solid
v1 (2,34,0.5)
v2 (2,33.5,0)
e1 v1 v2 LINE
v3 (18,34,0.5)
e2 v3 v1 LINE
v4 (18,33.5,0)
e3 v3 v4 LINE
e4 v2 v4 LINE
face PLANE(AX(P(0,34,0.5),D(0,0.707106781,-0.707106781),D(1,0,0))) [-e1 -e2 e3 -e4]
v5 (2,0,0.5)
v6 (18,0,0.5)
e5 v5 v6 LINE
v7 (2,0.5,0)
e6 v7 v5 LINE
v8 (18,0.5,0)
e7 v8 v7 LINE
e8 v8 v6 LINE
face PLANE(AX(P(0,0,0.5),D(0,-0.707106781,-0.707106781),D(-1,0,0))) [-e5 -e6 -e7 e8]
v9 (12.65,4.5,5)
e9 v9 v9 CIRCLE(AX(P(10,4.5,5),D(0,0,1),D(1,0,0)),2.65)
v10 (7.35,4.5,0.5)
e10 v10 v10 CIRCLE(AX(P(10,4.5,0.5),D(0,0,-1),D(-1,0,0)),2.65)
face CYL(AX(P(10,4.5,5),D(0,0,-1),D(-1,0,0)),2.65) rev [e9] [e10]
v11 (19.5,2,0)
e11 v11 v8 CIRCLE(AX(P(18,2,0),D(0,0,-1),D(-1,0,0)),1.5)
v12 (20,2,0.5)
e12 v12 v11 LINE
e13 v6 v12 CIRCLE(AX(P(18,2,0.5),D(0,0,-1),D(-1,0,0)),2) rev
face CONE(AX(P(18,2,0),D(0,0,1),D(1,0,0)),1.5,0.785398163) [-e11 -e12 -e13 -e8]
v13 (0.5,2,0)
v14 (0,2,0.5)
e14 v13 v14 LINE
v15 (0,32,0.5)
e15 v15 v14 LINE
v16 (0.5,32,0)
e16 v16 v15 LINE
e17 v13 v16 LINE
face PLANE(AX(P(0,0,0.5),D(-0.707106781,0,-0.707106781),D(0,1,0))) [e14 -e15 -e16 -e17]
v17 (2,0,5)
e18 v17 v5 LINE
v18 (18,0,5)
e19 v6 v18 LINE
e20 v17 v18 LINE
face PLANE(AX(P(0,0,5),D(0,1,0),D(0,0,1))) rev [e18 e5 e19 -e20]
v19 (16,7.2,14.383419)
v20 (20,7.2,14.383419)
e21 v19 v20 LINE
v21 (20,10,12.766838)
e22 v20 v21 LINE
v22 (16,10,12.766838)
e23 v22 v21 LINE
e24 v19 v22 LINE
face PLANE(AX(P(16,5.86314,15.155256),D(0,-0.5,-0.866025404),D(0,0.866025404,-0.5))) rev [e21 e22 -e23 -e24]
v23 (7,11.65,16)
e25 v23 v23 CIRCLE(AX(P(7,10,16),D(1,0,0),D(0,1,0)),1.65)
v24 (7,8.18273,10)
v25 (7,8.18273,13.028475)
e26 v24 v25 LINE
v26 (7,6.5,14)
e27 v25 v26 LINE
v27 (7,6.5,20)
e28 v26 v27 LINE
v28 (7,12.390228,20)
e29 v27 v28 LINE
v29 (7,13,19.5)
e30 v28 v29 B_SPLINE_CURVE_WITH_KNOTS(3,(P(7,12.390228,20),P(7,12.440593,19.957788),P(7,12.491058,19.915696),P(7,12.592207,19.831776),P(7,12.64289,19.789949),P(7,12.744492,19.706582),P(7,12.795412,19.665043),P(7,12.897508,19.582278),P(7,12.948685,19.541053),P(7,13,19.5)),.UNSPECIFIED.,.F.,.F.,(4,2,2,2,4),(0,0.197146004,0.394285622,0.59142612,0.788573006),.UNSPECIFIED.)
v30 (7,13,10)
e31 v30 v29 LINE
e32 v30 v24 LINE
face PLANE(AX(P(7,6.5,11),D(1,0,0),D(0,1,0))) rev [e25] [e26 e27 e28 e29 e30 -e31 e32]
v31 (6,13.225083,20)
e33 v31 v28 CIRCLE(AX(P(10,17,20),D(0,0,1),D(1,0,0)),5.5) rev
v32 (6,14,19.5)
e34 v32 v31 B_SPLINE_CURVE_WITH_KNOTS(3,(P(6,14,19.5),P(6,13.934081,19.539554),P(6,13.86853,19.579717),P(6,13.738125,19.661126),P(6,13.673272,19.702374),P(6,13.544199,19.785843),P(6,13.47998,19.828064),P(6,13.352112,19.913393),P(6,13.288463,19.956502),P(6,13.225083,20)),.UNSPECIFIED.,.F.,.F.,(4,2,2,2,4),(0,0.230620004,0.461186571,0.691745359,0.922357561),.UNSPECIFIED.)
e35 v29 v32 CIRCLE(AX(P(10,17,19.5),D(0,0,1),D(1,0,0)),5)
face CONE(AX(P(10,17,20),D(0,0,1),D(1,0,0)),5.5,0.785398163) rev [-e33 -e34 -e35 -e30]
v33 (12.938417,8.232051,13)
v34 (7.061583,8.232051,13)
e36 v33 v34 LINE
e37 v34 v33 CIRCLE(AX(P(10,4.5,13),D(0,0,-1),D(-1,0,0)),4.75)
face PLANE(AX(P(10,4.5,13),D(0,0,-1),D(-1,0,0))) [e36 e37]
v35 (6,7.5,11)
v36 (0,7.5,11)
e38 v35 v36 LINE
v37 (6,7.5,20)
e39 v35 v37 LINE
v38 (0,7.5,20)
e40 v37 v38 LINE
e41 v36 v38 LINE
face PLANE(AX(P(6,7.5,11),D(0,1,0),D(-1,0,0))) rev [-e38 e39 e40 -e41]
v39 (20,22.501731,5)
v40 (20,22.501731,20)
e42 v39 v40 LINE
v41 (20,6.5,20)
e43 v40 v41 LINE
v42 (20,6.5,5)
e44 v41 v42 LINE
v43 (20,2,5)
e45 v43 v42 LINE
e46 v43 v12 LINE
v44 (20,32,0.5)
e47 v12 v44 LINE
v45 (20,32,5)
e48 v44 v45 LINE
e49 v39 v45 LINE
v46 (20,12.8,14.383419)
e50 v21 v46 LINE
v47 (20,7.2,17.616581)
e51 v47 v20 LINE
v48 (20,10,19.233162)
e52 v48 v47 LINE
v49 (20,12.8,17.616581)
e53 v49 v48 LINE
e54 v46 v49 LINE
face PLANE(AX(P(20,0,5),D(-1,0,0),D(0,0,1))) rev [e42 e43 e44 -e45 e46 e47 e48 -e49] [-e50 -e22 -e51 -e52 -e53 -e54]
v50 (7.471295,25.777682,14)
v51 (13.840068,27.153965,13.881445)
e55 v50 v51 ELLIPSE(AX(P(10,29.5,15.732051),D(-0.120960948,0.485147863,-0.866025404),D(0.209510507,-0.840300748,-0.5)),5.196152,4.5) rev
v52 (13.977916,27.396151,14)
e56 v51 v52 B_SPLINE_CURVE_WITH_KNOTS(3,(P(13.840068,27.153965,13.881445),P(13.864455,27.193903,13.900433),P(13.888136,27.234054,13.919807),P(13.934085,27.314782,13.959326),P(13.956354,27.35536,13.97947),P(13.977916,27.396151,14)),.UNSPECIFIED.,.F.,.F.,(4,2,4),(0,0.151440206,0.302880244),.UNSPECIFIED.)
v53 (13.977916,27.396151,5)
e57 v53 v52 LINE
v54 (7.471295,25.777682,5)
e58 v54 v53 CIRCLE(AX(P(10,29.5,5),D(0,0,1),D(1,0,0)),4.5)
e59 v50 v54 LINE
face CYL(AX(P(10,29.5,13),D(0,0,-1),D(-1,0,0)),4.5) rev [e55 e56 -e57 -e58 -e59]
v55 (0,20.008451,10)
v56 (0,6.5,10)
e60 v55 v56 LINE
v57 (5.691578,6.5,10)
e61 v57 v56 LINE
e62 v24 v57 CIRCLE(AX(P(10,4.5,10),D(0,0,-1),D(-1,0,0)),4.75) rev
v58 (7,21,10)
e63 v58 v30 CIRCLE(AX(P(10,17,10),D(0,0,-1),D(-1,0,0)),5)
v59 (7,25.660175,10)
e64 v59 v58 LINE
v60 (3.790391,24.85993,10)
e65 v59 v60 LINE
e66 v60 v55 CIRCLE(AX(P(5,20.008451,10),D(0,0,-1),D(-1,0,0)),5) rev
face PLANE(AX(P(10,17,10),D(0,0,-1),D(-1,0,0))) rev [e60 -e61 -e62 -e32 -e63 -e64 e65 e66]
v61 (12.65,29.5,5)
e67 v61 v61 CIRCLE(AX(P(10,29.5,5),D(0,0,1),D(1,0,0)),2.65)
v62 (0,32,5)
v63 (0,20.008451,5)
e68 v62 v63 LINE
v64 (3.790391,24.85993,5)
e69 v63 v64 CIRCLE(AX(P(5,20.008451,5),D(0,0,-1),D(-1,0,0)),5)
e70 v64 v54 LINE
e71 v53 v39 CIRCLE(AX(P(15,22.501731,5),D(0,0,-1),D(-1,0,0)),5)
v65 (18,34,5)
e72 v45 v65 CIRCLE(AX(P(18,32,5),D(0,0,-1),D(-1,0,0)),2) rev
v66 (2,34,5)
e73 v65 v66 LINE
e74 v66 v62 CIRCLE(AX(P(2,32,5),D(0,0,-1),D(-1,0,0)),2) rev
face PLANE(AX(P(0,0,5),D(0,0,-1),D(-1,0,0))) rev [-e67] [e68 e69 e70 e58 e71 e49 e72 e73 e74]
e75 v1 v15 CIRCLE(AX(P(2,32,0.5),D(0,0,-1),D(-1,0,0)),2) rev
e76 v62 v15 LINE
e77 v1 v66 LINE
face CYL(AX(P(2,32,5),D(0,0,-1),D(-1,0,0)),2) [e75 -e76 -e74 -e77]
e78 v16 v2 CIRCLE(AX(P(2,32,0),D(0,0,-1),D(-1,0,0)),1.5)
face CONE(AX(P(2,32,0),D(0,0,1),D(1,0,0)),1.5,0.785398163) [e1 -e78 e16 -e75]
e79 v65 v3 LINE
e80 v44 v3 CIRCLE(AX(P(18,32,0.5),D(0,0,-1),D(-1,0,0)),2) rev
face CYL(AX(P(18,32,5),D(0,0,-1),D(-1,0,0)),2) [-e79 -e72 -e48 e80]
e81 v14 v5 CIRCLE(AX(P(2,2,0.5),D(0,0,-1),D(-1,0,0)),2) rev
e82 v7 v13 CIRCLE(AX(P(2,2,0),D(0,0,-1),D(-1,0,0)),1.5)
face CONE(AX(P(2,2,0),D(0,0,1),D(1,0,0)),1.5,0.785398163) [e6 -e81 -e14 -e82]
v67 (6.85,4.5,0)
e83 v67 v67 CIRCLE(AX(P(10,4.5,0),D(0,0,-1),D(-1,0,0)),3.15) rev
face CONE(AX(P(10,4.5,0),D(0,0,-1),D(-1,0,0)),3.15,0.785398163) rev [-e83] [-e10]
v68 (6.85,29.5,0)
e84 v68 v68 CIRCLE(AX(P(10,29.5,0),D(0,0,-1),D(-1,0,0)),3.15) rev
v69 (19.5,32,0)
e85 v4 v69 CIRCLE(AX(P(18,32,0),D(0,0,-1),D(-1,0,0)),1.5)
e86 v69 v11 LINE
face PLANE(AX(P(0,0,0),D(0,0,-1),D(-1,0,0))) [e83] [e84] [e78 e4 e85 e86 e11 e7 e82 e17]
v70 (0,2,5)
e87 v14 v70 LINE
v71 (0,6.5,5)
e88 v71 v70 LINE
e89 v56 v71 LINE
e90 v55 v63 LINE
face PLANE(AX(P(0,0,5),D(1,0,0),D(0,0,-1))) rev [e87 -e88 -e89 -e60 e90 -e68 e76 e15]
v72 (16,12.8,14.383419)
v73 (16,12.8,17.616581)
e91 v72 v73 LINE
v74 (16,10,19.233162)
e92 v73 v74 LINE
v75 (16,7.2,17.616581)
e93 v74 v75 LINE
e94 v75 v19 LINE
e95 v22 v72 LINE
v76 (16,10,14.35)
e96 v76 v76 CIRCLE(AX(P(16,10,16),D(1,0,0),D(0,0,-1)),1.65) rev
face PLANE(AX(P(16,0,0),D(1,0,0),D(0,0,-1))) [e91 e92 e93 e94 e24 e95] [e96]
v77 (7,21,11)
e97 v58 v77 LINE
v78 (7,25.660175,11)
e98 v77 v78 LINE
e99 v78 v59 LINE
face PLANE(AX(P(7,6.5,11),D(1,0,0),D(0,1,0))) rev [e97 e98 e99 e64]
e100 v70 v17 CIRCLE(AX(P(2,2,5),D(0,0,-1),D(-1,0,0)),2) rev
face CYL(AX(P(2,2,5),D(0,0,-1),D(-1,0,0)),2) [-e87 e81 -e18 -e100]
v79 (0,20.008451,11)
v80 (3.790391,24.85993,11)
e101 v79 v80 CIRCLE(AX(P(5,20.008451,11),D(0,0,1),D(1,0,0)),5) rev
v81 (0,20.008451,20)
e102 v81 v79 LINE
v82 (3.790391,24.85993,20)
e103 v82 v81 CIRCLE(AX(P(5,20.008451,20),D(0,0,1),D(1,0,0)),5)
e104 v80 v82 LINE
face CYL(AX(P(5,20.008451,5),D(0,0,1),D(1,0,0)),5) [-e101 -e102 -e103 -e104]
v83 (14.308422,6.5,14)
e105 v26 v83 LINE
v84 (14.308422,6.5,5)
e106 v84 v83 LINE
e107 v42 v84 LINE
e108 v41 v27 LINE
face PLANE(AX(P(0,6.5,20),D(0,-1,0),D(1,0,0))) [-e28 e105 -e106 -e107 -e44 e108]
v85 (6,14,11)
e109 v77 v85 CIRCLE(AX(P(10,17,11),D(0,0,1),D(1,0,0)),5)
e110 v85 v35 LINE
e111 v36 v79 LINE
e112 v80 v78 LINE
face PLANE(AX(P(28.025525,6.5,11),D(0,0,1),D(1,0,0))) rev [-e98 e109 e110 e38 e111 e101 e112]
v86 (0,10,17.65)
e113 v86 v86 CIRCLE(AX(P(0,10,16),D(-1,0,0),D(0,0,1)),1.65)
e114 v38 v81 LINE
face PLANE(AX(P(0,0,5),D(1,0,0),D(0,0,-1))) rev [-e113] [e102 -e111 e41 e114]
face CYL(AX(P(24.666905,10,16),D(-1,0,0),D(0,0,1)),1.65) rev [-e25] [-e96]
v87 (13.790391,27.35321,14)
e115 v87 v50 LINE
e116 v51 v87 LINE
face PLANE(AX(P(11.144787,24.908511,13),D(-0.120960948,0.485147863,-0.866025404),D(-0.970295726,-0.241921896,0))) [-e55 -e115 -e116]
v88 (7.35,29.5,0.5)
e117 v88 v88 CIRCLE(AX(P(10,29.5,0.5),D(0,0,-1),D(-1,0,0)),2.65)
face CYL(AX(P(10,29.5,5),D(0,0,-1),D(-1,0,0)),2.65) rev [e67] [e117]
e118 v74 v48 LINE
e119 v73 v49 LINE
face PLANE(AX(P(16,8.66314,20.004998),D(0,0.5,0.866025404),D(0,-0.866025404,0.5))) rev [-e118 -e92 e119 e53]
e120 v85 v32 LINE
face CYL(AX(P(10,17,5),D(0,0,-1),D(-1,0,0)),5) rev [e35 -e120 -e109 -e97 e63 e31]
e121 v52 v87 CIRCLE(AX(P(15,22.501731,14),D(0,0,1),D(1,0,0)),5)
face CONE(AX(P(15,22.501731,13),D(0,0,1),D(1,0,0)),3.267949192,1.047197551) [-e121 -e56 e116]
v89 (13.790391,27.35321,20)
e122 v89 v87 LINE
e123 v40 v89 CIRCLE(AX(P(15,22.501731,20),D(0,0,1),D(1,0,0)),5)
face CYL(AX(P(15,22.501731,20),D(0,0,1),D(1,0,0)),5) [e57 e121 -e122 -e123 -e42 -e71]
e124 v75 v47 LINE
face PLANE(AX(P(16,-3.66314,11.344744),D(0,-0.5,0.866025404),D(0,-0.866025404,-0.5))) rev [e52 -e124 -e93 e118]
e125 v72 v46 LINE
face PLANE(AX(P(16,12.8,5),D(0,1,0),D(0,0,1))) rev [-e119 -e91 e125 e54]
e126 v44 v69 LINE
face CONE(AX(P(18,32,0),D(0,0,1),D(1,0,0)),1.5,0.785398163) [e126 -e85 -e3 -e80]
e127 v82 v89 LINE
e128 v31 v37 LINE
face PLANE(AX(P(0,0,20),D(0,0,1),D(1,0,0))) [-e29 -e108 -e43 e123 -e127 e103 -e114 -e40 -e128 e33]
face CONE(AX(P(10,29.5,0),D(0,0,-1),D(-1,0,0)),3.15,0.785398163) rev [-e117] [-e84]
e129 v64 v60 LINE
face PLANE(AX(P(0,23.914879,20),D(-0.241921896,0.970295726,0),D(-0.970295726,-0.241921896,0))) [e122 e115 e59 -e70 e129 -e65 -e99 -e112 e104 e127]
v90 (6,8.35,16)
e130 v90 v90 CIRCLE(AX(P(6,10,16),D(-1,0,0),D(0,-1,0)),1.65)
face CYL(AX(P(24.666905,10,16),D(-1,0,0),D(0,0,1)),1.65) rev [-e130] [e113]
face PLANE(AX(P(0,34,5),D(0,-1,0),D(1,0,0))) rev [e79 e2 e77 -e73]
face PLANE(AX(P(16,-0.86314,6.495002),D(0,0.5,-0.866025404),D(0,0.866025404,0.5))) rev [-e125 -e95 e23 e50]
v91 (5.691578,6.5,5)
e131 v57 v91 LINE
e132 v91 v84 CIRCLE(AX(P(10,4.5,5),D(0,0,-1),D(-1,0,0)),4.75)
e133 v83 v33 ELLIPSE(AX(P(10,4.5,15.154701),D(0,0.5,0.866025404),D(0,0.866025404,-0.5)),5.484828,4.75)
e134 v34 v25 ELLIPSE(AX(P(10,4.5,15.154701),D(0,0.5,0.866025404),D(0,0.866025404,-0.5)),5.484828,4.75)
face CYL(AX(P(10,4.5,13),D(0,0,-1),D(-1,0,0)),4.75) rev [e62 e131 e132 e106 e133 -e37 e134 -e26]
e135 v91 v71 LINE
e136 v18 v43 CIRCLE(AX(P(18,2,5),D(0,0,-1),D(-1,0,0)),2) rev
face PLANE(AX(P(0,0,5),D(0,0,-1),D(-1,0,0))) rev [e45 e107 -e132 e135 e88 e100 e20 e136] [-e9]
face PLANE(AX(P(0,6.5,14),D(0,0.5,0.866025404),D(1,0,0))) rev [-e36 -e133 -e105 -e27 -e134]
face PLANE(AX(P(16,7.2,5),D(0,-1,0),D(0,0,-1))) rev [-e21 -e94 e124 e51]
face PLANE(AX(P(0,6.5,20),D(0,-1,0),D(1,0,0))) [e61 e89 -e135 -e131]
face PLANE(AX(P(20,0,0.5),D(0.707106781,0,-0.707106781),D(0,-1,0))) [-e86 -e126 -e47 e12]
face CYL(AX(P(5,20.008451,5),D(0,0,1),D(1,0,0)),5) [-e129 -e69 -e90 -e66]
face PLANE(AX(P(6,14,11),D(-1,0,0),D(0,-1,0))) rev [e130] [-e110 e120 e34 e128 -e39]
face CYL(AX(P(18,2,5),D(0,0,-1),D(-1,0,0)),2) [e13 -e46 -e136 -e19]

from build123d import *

# Parameters (mm, degrees)
ESBO_O1_W                = 20
ESBO_O1_H                = 34
ESBO_O1_R                = 5
ESBO_O1_R_2              = 2.65
RESSALTO_EXTRUS_O1_DEPTH = 5
ESBO_O2_R                = 5
RESSALTO_EXTRUS_O2_DEPTH = 20
CORTE_EXTRUS_O1_START    = -9
CORTE_EXTRUS_O1_DEPTH    = 9
CORTE_EXTRUS_O3_REACH    = 46.227
ESBO_O5_R                = 1.65
CORTE_EXTRUS_O2_DEPTH    = 4
FILETE1_R                = 5
FILETE2_R                = 2
CORTE_EXTRUS_O4_START    = -15
ESBO_O6_R                = 4.75
CORTE_EXTRUS_O4_DEPTH    = 8
ESBO_O7_R                = 5
RESSALTO_EXTRUS_O3_DEPTH = 10
ESBO_O8_W                = 1
ESBO_O8_H                = 21.001730979
CORTE_EXTRUS_O5_DEPTH    = 7
ESBO_O10_R               = 4.5
CORTE_EXTRUS_O7_DEPTH    = 8
CHANFRO5_SIZE            = 1.732050808
CHANFRO5_SIZE_2          = 1
CORTE_EXTRUS_O8_START    = -10
CORTE_EXTRUS_O8_DEPTH    = 10
CHANFRO2_SIZE            = 0.5


with BuildPart() as part:
    # Esboço1 → Ressalto-extrusão1 (new body)
    with BuildSketch(Plane.XY):
        with Locations((10, 17)):
            Rectangle(ESBO_O1_W, ESBO_O1_H)
        with Locations((10, 17)):
            Circle(ESBO_O1_R, mode=Mode.SUBTRACT)
        with Locations((10, 29.5)):
            Circle(ESBO_O1_R_2, mode=Mode.SUBTRACT)
        with Locations((10, 4.5)):
            Circle(ESBO_O1_R_2, mode=Mode.SUBTRACT)
    extrude(amount=RESSALTO_EXTRUS_O1_DEPTH)

    # Esboço2 → Ressalto-extrusão2 (add)
    with BuildSketch(Plane(origin=(0, 0, 0), x_dir=(-1, 0, 0), z_dir=(0, 0, -1))):
        Polygon((0, 23.914879084), (-20, 28.90143914), (-20, 6.5), (0, 6.5), align=None)
        with Locations((-10, 17)):
            Circle(ESBO_O2_R, mode=Mode.SUBTRACT)
    extrude(amount=-RESSALTO_EXTRUS_O2_DEPTH)

    # Esboço3 → Corte-extrusão1 (cut)
    with BuildSketch(Plane.XY.offset(20).offset(CORTE_EXTRUS_O1_START)):
        with BuildLine():
            Line((6, 14), (6, 7.5))
            Line((6, 7.5), (0, 7.5))
            Line((0, 7.5), (0, 6.5))
            Line((0, 6.5), (7, 6.5))
            Line((7, 6.5), (7, 13))
            ThreePointArc((7, 13), (6.464466094, 13.464466094), (6, 14))
        make_face()
    extrude(amount=CORTE_EXTRUS_O1_DEPTH, mode=Mode.SUBTRACT)

    # Corte-extrusão3: up to this face of the body (flat: up to its plane)
    corte_extrus_o3_end = Plane(part.part.faces().sort_by_distance((20, 17.465309995, 9.140459531))[0])
    # Esboço5 → Corte-extrusão3 (cut, up to the picked face)
    with BuildSketch(Plane.ZY, mode=Mode.PRIVATE) as corte_extrus_o3_sk1:
        with Locations((16, 10)):
            Circle(ESBO_O5_R)
    corte_extrus_o3_tool1 = split(extrude(corte_extrus_o3_sk1.sketch, amount=-CORTE_EXTRUS_O3_REACH, mode=Mode.PRIVATE), bisect_by=corte_extrus_o3_end, keep=Keep.BOTH, mode=Mode.PRIVATE)
    add(corte_extrus_o3_tool1.solids().sort_by(Axis((0, 10, 16), (1, 0, 0)))[0], mode=Mode.SUBTRACT)

    # Esboço4 → Corte-extrusão2 (cut)
    with BuildSketch(Plane(origin=(20, 0, 0), x_dir=(0, 0, -1), z_dir=(1, 0, 0))):
        Polygon((-19.233161507, 10), (-17.616580754, 7.2), (-14.383419246, 7.2), (-12.766838493, 10), (-14.383419246, 12.8), (-17.616580754, 12.8), align=None)
    extrude(amount=-CORTE_EXTRUS_O2_DEPTH, mode=Mode.SUBTRACT)

    # Filete1
    filete1_edges = [part.edges().sort_by_distance(p)[0] for p in [
        (0, 23.914879084, 12.5),
        (20, 28.90143914, 12.5),
    ]]
    fillet(filete1_edges, radius=FILETE1_R)

    # Filete2
    filete2_edges = [part.edges().sort_by_distance(p)[0] for p in [
        (0, 34, 2.5),
        (20, 34, 2.5),
        (20, 0, 2.5),
        (0, 0, 2.5),
    ]]
    fillet(filete2_edges, radius=FILETE2_R)

    # Esboço6 → Corte-extrusão4 (cut)
    with BuildSketch(Plane.XY.offset(20).offset(CORTE_EXTRUS_O4_START)):
        with Locations((10, 4.5)):
            Circle(ESBO_O6_R)
    extrude(amount=CORTE_EXTRUS_O4_DEPTH, mode=Mode.SUBTRACT)

    # Esboço7 → Ressalto-extrusão3 (add)
    with BuildSketch(Plane(origin=(0, 0, 0), x_dir=(-1, 0, 0), z_dir=(0, 0, -1))):
        with Locations((-10, 17)):
            Circle(ESBO_O7_R)
    extrude(amount=-RESSALTO_EXTRUS_O3_DEPTH)

    # Esboço8 → Corte-extrusão5 (cut)
    with BuildSketch(Plane.ZY):
        with Locations((10.5, 17.00086549)):
            Rectangle(ESBO_O8_W, ESBO_O8_H)
    extrude(amount=-CORTE_EXTRUS_O5_DEPTH, mode=Mode.SUBTRACT)

    # Esboço10 → Corte-extrusão7 (cut)
    with BuildSketch(Plane.XY.offset(5)):
        with Locations((10, 29.5)):
            Circle(ESBO_O10_R)
    extrude(amount=CORTE_EXTRUS_O7_DEPTH, mode=Mode.SUBTRACT)

    # Chanfro5
    # the kernel refuses this chamfer: 1.732050808, 1 mm, written as the material it takes off along each edge
    with BuildSketch(Plane(origin=(18.789385955, 6.5, 13), x_dir=(0, 0.9998132206222079, -0.019326765612700685), z_dir=(-1, 0, 0))) as chanfro5_piece_1_section:
        Polygon((CHANFRO5_SIZE * 0.999813220373, -CHANFRO5_SIZE * 0.0193267656079), (-CHANFRO5_SIZE_2 * 0.0193267656127, -CHANFRO5_SIZE_2 * 0.999813220622), (0, 0), align=None)
    chanfro5_piece_1 = extrude(amount=16.270349926, mode=Mode.PRIVATE)
    chanfro5_piece_1 = chanfro5_piece_1 & Plane(origin=(10, 4.5, 13.142171605), x_dir=(1, 0, 0), z_dir=(0, 0, -1)) * Cylinder(4.75, 40, mode=Mode.PRIVATE)
    add(chanfro5_piece_1, mode=Mode.SUBTRACT)
    with BuildSketch(Plane(origin=(3.123434693, 24.693638818, 13), x_dir=(-0.014005792936040639, 0.056174167266921864, 0.9983227437537926), z_dir=(0.9702957262759956, 0.2419218955996716, 0))) as chanfro5_piece_2_section:
        Polygon((CHANFRO5_SIZE_2 * 0.998322743754, CHANFRO5_SIZE_2 * 0.0578938624027), (-CHANFRO5_SIZE * 0.0578938623883, CHANFRO5_SIZE * 0.998322743505), (0, 0), align=None)
    chanfro5_piece_2 = extrude(amount=10.993510061, mode=Mode.PRIVATE)
    chanfro5_piece_2 = chanfro5_piece_2 & Plane(origin=(10, 29.5, 13.381027624), x_dir=(1, 0, 0), z_dir=(0, 0, -1)) * Cylinder(4.5, 29, mode=Mode.PRIVATE)
    add(chanfro5_piece_2, mode=Mode.SUBTRACT)
    with BuildSketch(Plane(origin=(15, 22.501730979, 13), x_dir=(0.6367879492997914, 0.7710389793172368, 0), z_dir=(0.7710389793172368, -0.6367879492997914, 0))) as chanfro5_piece_3_section:
        Polygon((5 - CHANFRO5_SIZE, 0), (5, CHANFRO5_SIZE_2), (5, 0), align=None)
    chanfro5_piece_3 = revolve(axis=Axis((15, 22.501730979, 13), (0, 0, 1)), revolution_arc=53.552719823, mode=Mode.PRIVATE)
    chanfro5_piece_3 = chanfro5_piece_3 & Plane(origin=(10, 29.5, 13.480391977), x_dir=(1, 0, 0), z_dir=(0, 0, -1)) * Cylinder(4.5, 20, mode=Mode.PRIVATE)
    add(chanfro5_piece_3, mode=Mode.SUBTRACT)

    # Esboço11 → Corte-extrusão8 (cut)
    with BuildSketch(Plane.XY.offset(5).offset(CORTE_EXTRUS_O8_START)):
        with BuildLine():
            ThreePointArc((8.261466135, 6.5), (10, 1.85), (11.738533865, 6.5))
            ThreePointArc((11.738533865, 6.5), (10, 7.15), (8.261466135, 6.5))
        make_face()
    extrude(amount=CORTE_EXTRUS_O8_DEPTH, mode=Mode.SUBTRACT)

    # Chanfro2
    chanfro2_edges = [part.edges().sort_by_distance(p)[0] for p in [
        (10, 34, 0),
        (20, 17, 0),
        (10, 0, 0),
        (0, 17, 0),
        (0.585786438, 33.414213562, 0),
        (0.585786438, 0.585786438, 0),
        (19.414213562, 0.585786438, 0),
        (19.414213562, 33.414213562, 0),
        (7.35, 29.5, 0),
        (8.261466135, 2.5, 0),
        (13.535533906, 20.535533906, 20),
    ]]
    chamfer(chanfro2_edges, length=CHANFRO2_SIZE)


solid = part.part
